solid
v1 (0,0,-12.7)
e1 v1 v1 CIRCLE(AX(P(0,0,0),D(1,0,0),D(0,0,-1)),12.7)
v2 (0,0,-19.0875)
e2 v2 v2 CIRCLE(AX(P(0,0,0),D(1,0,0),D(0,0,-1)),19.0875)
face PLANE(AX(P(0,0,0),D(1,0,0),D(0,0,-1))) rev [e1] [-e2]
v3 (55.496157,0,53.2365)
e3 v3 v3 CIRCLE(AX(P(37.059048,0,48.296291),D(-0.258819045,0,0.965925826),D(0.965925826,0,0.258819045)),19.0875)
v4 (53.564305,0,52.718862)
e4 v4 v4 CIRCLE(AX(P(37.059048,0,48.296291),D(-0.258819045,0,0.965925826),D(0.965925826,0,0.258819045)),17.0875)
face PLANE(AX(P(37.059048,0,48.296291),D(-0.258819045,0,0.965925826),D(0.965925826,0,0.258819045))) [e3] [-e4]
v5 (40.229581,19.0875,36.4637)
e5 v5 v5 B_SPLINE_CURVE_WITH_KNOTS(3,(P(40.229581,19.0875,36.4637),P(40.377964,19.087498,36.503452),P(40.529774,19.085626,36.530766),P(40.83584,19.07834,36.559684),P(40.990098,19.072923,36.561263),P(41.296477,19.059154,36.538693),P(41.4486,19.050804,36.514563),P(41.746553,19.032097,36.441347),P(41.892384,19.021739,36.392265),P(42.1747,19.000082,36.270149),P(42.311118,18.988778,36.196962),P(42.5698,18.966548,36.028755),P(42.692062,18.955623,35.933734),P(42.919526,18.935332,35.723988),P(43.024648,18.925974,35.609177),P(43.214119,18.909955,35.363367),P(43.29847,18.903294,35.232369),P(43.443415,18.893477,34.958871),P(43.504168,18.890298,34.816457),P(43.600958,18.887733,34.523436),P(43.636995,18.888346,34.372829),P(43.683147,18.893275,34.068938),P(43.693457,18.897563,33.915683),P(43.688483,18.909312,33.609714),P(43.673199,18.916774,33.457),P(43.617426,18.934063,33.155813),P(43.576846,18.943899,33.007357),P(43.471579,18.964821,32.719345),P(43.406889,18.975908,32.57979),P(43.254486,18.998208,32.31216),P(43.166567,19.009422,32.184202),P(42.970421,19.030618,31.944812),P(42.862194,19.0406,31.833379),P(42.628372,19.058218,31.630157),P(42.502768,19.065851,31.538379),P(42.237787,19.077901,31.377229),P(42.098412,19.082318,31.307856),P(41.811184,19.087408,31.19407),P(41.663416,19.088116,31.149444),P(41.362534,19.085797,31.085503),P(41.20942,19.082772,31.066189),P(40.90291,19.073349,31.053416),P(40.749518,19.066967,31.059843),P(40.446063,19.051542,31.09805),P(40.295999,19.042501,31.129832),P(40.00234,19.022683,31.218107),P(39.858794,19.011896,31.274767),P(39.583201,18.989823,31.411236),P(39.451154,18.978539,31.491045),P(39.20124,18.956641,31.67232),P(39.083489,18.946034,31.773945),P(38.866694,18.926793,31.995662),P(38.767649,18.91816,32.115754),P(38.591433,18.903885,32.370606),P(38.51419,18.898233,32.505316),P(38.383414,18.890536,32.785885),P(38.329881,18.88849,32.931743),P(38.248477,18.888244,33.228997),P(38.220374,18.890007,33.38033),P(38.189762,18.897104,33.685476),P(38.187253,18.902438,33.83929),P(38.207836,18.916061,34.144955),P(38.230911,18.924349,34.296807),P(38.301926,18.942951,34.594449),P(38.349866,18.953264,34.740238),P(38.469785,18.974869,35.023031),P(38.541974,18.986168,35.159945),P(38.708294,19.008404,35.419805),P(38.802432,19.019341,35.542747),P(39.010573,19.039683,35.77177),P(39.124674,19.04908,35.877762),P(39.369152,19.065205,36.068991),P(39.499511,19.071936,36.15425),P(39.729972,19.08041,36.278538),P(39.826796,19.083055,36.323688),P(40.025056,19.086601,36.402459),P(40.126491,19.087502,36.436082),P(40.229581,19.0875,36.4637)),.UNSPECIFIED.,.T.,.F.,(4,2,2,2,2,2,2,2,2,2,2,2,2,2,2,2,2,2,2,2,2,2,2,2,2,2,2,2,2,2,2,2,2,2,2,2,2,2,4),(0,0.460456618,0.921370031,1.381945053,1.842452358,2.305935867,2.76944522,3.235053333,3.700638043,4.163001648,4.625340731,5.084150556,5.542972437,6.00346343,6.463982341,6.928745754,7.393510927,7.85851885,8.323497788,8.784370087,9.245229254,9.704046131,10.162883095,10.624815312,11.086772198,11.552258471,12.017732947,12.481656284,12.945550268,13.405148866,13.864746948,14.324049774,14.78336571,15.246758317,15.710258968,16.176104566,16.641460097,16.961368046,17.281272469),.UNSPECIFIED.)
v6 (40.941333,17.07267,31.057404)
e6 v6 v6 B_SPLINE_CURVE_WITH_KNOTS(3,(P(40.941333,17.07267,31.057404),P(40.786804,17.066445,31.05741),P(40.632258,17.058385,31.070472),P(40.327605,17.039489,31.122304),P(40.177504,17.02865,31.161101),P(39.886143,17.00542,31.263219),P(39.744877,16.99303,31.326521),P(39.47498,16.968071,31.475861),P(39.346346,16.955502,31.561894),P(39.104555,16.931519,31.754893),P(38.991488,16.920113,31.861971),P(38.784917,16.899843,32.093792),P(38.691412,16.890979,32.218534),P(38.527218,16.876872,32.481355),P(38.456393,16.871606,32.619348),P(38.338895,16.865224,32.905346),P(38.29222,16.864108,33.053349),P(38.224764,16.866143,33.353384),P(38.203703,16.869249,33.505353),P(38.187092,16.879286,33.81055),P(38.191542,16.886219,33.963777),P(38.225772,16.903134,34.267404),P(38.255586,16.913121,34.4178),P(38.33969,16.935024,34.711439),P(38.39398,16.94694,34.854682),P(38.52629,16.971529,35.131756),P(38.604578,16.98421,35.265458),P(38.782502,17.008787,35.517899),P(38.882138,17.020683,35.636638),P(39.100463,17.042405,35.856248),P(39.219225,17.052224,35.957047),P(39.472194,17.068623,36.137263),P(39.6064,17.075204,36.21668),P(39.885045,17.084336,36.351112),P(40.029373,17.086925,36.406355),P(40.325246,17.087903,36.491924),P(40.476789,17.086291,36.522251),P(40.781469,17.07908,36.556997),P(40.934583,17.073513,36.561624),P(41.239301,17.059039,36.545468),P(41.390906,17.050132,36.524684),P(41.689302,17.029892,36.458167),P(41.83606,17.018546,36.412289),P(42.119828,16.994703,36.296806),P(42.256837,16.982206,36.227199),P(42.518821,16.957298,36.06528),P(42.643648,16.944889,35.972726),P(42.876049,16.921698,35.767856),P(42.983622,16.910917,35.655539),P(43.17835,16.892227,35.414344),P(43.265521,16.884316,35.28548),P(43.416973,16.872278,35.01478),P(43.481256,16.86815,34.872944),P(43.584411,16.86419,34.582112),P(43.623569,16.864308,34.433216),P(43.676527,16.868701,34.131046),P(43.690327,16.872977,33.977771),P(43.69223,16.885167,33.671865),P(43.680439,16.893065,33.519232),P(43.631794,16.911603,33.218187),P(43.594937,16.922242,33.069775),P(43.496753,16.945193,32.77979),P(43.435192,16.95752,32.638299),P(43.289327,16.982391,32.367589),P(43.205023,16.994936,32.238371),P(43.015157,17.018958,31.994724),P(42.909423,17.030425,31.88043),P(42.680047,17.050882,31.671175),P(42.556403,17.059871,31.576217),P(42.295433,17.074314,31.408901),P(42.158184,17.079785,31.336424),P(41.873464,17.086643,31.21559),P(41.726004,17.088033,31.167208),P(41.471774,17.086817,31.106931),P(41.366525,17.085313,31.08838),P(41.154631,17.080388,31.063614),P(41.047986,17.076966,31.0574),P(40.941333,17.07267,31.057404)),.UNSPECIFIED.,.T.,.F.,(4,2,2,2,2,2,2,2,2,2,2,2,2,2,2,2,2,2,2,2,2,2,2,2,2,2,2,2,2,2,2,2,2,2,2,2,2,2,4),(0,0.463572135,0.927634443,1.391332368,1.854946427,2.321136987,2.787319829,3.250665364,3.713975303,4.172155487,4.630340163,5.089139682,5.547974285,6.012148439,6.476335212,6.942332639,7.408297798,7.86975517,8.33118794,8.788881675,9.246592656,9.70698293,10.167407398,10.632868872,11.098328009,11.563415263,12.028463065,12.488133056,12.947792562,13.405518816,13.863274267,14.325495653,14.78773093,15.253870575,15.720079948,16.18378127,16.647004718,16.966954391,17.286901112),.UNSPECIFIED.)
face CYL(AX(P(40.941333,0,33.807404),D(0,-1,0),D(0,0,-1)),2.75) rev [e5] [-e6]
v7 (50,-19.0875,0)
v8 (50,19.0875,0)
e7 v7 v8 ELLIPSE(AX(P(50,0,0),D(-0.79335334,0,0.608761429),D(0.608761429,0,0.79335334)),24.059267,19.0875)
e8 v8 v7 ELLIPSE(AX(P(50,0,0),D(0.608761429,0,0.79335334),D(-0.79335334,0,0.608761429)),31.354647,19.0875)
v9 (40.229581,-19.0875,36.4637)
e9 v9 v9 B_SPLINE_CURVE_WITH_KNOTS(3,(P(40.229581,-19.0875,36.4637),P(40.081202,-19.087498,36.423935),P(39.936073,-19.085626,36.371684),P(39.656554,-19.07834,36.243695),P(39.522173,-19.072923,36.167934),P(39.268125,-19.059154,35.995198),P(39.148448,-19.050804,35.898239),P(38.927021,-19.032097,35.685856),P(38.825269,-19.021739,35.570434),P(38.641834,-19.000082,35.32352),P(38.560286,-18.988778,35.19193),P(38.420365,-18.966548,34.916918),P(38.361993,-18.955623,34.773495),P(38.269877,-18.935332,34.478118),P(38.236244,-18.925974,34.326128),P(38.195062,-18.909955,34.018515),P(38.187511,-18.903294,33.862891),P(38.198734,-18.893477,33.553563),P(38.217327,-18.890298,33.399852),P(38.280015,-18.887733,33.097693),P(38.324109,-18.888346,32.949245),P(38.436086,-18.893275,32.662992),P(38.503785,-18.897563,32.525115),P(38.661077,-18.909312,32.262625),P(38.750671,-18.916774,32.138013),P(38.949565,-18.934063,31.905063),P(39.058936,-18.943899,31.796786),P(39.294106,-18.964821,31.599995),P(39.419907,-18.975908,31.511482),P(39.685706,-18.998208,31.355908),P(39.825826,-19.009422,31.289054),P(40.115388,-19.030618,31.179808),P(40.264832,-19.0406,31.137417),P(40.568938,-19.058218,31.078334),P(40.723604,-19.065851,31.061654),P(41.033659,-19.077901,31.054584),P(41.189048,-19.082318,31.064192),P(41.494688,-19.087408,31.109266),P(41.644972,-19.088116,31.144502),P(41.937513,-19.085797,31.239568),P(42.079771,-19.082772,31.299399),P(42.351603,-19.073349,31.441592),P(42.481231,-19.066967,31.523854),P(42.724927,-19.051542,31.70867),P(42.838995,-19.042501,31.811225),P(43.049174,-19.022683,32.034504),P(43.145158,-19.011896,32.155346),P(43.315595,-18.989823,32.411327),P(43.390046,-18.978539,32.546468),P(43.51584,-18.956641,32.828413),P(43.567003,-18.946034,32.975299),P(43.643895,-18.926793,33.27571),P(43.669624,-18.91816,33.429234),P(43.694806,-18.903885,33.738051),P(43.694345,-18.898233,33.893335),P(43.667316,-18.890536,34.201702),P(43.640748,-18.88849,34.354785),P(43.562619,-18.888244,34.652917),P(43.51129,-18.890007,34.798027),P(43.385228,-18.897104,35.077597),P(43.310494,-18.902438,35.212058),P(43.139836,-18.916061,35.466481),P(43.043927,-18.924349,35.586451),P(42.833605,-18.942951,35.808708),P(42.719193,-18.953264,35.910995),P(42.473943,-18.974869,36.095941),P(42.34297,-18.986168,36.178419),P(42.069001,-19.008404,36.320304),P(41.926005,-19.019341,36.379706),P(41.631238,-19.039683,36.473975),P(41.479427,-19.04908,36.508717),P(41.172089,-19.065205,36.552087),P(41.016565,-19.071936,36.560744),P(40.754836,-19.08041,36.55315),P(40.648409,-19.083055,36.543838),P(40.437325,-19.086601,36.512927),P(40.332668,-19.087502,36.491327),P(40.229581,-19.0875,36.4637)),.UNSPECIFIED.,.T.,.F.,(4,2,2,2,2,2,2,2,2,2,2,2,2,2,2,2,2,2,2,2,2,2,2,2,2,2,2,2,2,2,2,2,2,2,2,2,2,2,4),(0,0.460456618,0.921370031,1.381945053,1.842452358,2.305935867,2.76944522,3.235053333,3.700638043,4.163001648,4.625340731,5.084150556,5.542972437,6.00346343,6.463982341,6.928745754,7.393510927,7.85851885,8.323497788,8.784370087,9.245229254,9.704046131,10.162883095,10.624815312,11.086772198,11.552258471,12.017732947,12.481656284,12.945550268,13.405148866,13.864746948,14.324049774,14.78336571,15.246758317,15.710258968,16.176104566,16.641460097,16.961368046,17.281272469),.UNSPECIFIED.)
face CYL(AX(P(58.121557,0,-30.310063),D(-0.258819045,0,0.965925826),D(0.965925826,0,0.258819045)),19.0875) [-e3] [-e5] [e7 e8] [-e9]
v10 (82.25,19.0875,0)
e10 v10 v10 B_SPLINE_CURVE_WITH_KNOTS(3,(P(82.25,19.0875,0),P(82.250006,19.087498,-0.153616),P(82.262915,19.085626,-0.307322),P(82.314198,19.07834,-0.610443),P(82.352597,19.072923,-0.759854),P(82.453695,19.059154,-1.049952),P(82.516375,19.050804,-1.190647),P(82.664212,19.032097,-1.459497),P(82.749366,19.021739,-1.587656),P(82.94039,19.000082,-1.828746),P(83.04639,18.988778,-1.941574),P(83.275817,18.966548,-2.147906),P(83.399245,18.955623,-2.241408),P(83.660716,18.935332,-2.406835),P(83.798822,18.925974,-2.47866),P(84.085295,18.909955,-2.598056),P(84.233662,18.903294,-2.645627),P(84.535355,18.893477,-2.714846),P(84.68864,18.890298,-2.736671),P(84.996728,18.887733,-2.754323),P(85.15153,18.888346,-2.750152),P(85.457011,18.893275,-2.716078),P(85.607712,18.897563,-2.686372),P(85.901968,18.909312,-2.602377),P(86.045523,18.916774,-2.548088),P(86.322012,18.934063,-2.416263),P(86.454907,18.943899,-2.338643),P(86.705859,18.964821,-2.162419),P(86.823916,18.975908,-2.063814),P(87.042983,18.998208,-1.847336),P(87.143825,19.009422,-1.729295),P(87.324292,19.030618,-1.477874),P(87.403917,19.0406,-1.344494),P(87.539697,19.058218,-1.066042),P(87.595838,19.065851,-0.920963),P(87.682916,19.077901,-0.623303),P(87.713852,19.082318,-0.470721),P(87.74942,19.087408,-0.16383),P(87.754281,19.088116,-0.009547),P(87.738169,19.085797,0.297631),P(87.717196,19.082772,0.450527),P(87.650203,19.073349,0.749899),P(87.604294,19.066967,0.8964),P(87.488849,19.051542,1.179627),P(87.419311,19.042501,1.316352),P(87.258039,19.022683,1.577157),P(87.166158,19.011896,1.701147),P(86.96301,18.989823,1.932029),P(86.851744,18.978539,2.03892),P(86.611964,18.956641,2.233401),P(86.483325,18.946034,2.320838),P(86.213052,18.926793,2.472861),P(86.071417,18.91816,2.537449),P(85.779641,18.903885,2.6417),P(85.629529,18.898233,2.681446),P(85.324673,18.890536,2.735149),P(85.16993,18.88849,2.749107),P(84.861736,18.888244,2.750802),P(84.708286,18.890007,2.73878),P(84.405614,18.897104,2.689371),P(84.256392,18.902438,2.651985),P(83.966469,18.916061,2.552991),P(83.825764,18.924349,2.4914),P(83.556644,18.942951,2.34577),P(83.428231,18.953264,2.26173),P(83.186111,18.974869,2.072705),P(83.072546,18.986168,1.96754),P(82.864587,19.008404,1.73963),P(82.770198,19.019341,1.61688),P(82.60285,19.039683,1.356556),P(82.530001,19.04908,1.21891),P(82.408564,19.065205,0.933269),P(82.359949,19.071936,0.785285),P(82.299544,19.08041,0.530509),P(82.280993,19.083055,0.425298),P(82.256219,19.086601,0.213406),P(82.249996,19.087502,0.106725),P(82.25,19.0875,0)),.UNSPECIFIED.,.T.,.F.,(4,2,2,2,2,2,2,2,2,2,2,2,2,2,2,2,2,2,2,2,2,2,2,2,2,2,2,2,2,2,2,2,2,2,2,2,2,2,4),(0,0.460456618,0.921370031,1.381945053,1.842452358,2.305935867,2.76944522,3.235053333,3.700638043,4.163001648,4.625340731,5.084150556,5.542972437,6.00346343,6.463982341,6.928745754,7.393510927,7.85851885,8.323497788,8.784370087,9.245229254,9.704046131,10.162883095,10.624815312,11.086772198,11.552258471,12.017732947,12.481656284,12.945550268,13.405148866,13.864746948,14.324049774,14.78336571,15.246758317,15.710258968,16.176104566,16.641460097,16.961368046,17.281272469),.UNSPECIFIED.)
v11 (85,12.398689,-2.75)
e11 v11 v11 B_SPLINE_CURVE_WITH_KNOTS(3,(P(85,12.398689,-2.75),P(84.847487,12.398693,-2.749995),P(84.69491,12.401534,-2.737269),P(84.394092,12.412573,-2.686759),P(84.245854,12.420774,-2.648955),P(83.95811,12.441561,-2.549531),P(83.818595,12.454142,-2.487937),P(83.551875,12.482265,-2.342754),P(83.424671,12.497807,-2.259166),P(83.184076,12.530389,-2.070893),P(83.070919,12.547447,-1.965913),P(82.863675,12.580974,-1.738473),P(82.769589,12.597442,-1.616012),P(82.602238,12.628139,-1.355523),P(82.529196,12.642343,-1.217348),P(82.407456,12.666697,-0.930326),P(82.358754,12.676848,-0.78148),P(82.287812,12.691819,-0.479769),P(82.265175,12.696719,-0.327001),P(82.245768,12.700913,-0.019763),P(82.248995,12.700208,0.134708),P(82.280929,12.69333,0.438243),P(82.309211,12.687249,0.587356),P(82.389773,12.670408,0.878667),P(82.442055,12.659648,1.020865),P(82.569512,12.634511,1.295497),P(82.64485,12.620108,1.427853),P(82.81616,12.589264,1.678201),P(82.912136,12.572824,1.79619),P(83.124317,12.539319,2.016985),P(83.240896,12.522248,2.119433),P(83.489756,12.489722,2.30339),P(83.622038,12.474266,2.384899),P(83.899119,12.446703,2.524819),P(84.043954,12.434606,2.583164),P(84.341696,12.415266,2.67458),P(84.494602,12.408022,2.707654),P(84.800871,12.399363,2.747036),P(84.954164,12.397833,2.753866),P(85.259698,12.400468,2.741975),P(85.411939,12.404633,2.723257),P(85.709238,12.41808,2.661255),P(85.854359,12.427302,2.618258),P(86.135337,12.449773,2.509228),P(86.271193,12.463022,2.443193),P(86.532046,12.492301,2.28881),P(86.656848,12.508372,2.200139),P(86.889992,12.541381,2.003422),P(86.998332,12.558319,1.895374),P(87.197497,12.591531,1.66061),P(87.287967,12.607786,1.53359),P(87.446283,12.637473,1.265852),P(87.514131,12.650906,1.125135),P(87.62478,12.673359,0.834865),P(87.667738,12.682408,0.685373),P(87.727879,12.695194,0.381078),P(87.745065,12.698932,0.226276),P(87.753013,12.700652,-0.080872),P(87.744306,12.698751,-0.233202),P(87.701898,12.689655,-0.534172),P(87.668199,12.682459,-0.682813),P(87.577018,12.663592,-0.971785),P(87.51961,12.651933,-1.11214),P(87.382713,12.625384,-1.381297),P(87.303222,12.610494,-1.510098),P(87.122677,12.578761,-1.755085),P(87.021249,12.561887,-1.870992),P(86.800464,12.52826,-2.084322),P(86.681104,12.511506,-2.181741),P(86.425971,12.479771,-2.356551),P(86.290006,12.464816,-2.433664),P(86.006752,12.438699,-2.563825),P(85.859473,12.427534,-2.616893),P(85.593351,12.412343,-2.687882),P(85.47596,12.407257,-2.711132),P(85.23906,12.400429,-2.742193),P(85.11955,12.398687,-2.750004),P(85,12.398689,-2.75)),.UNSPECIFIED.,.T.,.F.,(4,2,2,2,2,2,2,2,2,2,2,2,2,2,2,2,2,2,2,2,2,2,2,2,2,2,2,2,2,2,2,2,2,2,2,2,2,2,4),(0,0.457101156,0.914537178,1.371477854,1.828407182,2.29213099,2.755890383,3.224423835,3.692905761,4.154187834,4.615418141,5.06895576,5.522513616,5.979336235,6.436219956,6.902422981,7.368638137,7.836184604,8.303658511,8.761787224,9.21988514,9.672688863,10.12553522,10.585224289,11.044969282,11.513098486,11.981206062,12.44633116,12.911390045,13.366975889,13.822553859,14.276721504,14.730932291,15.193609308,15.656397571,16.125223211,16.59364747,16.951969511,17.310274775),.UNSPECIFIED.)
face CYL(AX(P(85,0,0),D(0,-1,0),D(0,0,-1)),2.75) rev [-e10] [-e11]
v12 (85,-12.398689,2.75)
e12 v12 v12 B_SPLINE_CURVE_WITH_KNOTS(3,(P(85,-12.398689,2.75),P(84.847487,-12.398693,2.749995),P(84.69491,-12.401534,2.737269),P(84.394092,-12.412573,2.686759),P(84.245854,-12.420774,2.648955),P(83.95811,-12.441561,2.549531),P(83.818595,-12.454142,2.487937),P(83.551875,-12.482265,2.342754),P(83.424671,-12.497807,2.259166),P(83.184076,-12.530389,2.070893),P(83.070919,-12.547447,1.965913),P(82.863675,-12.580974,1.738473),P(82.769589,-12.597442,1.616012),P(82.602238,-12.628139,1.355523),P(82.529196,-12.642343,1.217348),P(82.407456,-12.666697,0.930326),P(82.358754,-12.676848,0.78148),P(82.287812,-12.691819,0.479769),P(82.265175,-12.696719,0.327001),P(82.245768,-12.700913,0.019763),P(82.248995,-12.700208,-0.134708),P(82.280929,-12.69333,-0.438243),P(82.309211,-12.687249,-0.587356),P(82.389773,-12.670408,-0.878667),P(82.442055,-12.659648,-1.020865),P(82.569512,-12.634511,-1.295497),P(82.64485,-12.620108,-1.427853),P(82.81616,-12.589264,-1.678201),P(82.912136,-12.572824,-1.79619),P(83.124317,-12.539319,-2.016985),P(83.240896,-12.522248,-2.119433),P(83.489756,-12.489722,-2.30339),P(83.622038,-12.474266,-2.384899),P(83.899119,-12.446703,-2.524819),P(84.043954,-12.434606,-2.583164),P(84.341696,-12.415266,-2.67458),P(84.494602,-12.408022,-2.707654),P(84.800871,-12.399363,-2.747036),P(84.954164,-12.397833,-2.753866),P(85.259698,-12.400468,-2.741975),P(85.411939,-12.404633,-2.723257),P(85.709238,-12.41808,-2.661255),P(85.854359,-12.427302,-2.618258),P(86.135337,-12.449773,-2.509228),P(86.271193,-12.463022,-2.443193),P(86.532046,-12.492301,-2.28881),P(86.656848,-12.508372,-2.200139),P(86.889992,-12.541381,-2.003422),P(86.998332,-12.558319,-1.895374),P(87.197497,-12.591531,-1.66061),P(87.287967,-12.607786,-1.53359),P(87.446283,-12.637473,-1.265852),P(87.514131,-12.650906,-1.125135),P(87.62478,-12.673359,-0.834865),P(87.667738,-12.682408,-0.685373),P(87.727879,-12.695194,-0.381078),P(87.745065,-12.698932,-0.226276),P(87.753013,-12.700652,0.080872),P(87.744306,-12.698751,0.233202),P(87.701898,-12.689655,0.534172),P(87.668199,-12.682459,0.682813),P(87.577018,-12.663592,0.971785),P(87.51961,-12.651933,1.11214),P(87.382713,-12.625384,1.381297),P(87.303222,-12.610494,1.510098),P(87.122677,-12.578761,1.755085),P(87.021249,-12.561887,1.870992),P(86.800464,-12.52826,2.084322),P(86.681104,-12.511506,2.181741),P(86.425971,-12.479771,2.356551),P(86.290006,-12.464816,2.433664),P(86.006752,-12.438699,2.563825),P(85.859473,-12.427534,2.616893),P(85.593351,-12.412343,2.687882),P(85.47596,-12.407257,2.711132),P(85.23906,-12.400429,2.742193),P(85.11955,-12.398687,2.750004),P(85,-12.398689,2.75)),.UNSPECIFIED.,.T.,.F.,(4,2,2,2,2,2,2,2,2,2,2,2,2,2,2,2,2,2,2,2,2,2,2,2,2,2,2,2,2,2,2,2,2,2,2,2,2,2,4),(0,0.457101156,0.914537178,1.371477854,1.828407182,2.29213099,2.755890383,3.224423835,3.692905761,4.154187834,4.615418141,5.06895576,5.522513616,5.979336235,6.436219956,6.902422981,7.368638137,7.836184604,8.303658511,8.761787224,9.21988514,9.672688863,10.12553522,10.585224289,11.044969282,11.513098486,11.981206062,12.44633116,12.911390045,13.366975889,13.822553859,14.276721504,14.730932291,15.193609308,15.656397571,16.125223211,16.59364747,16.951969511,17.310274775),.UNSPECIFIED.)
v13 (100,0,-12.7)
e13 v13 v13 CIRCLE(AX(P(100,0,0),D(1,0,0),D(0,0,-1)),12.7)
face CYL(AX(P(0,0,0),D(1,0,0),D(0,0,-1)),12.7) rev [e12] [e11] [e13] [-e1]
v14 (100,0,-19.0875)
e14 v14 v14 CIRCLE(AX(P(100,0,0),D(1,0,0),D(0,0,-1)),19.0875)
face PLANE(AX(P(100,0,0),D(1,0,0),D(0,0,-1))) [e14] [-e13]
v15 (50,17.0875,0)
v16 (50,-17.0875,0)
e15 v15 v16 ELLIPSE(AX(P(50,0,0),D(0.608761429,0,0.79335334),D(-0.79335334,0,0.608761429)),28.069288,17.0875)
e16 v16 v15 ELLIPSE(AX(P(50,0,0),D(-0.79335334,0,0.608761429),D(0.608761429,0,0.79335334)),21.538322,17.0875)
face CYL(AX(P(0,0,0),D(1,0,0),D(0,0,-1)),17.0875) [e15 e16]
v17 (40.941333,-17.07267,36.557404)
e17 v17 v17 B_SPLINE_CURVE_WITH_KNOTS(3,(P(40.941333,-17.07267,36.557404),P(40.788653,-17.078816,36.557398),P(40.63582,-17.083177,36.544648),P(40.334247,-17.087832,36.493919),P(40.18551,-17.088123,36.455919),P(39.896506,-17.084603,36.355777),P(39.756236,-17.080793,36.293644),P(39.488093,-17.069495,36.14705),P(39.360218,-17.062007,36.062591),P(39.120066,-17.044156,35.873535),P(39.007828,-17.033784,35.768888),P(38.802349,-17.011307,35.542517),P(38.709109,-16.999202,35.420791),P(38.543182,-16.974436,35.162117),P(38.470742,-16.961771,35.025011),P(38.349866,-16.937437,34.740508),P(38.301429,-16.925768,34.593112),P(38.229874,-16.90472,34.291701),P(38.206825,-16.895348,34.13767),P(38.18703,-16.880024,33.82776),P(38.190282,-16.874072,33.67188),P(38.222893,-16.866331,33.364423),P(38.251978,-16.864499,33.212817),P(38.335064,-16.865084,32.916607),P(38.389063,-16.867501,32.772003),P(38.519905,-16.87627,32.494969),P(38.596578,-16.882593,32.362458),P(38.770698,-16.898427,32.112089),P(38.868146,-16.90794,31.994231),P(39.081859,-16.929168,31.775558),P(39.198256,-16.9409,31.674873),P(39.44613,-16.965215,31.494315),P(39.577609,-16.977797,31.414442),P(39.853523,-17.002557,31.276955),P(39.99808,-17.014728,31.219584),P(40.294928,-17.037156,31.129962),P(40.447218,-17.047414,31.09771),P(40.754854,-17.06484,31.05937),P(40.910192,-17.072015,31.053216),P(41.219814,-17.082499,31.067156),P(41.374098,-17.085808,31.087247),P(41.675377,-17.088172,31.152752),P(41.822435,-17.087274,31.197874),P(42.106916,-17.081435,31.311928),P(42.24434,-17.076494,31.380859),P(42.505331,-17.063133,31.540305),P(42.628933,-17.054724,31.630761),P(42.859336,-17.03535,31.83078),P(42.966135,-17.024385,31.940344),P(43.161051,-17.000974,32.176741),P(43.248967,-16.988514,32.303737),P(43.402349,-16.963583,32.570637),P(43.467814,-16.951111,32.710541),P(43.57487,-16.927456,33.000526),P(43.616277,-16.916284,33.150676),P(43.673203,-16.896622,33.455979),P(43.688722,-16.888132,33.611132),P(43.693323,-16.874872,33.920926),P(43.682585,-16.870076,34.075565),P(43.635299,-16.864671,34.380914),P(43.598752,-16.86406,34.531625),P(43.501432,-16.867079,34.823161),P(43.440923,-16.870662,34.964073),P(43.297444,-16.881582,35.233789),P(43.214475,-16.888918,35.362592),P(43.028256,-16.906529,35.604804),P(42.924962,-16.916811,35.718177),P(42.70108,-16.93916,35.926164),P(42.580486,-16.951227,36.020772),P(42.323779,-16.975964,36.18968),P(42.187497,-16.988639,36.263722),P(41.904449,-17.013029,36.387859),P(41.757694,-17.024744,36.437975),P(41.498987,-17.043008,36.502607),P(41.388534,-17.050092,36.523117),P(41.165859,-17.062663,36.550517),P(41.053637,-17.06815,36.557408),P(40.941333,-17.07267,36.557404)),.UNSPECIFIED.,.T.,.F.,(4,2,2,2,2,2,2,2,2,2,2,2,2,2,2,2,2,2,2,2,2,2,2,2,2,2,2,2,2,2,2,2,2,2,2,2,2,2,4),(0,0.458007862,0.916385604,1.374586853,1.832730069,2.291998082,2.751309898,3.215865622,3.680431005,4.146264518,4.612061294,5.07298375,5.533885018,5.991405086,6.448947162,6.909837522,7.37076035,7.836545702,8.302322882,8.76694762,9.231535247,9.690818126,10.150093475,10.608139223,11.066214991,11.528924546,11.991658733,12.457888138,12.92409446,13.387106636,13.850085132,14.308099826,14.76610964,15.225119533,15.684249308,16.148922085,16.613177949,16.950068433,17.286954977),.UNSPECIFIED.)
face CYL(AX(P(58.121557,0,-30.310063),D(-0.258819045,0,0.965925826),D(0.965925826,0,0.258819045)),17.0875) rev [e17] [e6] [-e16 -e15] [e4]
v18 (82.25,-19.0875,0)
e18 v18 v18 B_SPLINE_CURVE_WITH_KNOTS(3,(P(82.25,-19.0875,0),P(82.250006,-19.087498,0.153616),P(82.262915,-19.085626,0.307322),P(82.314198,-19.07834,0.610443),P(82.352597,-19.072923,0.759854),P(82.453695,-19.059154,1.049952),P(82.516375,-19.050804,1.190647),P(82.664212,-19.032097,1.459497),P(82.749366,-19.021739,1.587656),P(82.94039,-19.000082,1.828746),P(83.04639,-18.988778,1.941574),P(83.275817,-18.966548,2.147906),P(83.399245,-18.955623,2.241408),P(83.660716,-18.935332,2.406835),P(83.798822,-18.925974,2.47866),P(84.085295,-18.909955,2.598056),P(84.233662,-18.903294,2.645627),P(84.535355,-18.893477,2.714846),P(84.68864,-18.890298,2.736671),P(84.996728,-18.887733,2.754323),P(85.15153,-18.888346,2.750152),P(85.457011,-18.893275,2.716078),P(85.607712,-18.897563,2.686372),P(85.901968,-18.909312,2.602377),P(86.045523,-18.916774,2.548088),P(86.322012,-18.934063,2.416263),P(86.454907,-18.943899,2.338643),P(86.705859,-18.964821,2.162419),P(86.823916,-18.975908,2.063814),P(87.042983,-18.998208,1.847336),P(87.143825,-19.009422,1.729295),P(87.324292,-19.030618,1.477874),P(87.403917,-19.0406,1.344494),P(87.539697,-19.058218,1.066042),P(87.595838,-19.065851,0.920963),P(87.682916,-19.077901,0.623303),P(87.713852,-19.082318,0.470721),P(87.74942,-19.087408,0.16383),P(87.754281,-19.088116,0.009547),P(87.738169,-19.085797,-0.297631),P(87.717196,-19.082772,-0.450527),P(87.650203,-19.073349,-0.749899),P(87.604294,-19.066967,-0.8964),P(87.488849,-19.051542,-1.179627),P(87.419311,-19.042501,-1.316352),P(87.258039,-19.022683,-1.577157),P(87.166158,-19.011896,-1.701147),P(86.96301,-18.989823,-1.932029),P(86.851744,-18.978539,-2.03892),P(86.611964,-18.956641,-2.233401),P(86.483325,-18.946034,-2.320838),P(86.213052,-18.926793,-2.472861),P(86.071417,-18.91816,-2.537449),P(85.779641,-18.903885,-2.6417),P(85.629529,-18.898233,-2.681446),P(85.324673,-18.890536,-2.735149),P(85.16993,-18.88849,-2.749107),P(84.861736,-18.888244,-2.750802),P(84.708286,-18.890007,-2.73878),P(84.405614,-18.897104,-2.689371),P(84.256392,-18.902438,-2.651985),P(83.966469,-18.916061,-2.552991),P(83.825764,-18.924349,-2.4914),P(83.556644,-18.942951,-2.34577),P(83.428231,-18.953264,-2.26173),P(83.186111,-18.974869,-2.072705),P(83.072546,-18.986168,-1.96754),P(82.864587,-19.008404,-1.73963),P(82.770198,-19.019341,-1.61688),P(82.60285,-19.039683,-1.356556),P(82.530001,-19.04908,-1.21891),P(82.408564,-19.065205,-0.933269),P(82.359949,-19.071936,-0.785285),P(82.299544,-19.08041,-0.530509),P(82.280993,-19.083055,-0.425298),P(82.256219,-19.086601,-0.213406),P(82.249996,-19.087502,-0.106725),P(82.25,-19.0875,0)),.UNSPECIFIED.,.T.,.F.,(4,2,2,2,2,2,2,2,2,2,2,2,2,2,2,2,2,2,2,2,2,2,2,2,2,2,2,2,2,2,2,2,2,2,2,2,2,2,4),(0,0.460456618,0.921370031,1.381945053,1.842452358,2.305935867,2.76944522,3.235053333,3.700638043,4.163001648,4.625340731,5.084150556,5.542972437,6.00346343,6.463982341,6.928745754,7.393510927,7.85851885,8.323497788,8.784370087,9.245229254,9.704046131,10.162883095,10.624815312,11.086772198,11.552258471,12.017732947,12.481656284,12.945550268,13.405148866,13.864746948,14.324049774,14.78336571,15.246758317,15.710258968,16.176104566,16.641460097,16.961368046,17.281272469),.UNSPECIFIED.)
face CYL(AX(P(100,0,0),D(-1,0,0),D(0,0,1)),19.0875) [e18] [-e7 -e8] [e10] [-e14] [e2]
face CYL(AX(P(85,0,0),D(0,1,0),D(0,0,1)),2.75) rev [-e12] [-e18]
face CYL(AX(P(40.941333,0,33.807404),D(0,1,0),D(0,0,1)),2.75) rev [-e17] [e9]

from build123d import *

# Parameters (mm, degrees)
SKETCH2_R                     = 19.0875
BOSS_EXTRUDE1_DEPTH           = 100
BOSS_EXTRUDE2_REACH           = 96.162
BOSS_EXTRUDE2_END_RADIUS      = 19.0875
SKETCH3_R                     = 19.0875
SHELL1_OUTLINE_R              = 17.0875
SHELL1_DEPTH                  = 100
SHELL1_START                  = -37.059047745
SHELL1_2_OUTLINE_R            = 17.0875
SHELL1_2_DEPTH                = 50.0000001
SKETCH8_R                     = 17.0875
SKETCH8_R_2                   = 12.7
BOSS_EXTRUDE3_DEPTH           = 100
SKETCH6_W                     = 2.75
SKETCH6_H                     = 19.0875
M5_CLEARANCE_HOLE1_AT_2_COUNT = 2
M5_CLEARANCE_HOLE1_AT_2_PITCH = 55.53473382
MIRROR1_COPY_1_SKETCH_W       = 2.75
MIRROR1_COPY_1_SKETCH_H       = 19.0875


with BuildPart() as part:
    # Sketch2 → Boss-Extrude1 (new body)
    with BuildSketch(Plane(origin=(0, 0, 0), x_dir=(0, 0, -1), z_dir=(1, 0, 0))):
        Circle(SKETCH2_R)
    extrude(amount=BOSS_EXTRUDE1_DEPTH)

    # Boss-Extrude2: up to this cylinder (the profile starts outside it)
    boss_extrude2_end = Plane(origin=(37.059048, 0, 0), z_dir=(-1, 0, 0)) * Cylinder(BOSS_EXTRUDE2_END_RADIUS, 231.499, mode=Mode.PRIVATE)
    # Sketch3 → Boss-Extrude2 (add, up to the surface)
    with BuildSketch(Plane(origin=(37.059047745, 0, 48.296291314), x_dir=(0.9659258262890673, 0, 0.2588190451025246), z_dir=(-0.2588190451025246, 0, 0.9659258262890673)), mode=Mode.PRIVATE) as boss_extrude2_sk1:
        Circle(SKETCH3_R)
    boss_extrude2_tool1 = extrude(boss_extrude2_sk1.sketch, amount=-BOSS_EXTRUDE2_REACH, mode=Mode.PRIVATE) - boss_extrude2_end
    add(boss_extrude2_tool1.solids().sort_by_distance((37.059048, 0, 48.296291))[0])

    # Shell1: read off the stored shape, not the designer's step
    # Shell1 outline → Shell1 (cut)
    with BuildSketch(Plane.YZ):
        Circle(SHELL1_OUTLINE_R)
    extrude(amount=SHELL1_DEPTH, mode=Mode.SUBTRACT)

    # Shell1 2 outline → Shell1 2 (cut)
    with BuildSketch(Plane(origin=(0, 0, 0), x_dir=(0.9659258262890672, 0, 0.2588190451025251), z_dir=(0.25881904510252507, 0, -0.9659258262890672)).offset(SHELL1_START)):
        with Locations((48.296291314, 0)):
            Circle(SHELL1_2_OUTLINE_R)
    extrude(amount=SHELL1_2_DEPTH, mode=Mode.SUBTRACT)

    # Sketch8 → Boss-Extrude3 (add, through all)
    with BuildSketch(Plane(origin=(100, 0, 0), x_dir=(0, 0, -1), z_dir=(1, 0, 0))):
        Circle(SKETCH8_R)
        Circle(SKETCH8_R_2, mode=Mode.SUBTRACT)
    extrude(amount=-BOSS_EXTRUDE3_DEPTH)

    # Sketch6 → M5 Clearance Hole1 (revolve, cut)
    with BuildSketch(Plane(origin=(85, 0, 0), x_dir=(0, 0, -1), z_dir=(1, 0, 0))):
        with Locations((1.375, 9.54375)):
            Rectangle(SKETCH6_W, SKETCH6_H)
    m5_clearance_hole1 = revolve(axis=Axis((85, -6.35, 0), (0, 1, 0)), mode=Mode.SUBTRACT)

    # M5 Clearance Hole1 at 2: M5 Clearance Hole1 ×2
    with Locations(*[Vector(-0.7933533402912365, 0, 0.608761429008719) * (i * M5_CLEARANCE_HOLE1_AT_2_PITCH) for i in range(1, M5_CLEARANCE_HOLE1_AT_2_COUNT)]):
        add(m5_clearance_hole1, mode=Mode.SUBTRACT)

    # Mirror1: M5 Clearance Hole1 across plane
    add(m5_clearance_hole1.mirror(Plane.ZX), mode=Mode.SUBTRACT)

    # Mirror1 copy 1 sketch → Mirror1 copy 1 (revolve, cut)
    with BuildSketch(Plane(origin=(40.941333421, 0, 33.80740392), x_dir=(0, 0, -1), z_dir=(1, 0, 0))):
        with Locations((1.375, -9.54375)):
            Rectangle(MIRROR1_COPY_1_SKETCH_W, MIRROR1_COPY_1_SKETCH_H)
    revolve(axis=Axis((40.941333421, 6.35, 33.80740392), (0, 1, 0)), mode=Mode.SUBTRACT)


solid = part.part
